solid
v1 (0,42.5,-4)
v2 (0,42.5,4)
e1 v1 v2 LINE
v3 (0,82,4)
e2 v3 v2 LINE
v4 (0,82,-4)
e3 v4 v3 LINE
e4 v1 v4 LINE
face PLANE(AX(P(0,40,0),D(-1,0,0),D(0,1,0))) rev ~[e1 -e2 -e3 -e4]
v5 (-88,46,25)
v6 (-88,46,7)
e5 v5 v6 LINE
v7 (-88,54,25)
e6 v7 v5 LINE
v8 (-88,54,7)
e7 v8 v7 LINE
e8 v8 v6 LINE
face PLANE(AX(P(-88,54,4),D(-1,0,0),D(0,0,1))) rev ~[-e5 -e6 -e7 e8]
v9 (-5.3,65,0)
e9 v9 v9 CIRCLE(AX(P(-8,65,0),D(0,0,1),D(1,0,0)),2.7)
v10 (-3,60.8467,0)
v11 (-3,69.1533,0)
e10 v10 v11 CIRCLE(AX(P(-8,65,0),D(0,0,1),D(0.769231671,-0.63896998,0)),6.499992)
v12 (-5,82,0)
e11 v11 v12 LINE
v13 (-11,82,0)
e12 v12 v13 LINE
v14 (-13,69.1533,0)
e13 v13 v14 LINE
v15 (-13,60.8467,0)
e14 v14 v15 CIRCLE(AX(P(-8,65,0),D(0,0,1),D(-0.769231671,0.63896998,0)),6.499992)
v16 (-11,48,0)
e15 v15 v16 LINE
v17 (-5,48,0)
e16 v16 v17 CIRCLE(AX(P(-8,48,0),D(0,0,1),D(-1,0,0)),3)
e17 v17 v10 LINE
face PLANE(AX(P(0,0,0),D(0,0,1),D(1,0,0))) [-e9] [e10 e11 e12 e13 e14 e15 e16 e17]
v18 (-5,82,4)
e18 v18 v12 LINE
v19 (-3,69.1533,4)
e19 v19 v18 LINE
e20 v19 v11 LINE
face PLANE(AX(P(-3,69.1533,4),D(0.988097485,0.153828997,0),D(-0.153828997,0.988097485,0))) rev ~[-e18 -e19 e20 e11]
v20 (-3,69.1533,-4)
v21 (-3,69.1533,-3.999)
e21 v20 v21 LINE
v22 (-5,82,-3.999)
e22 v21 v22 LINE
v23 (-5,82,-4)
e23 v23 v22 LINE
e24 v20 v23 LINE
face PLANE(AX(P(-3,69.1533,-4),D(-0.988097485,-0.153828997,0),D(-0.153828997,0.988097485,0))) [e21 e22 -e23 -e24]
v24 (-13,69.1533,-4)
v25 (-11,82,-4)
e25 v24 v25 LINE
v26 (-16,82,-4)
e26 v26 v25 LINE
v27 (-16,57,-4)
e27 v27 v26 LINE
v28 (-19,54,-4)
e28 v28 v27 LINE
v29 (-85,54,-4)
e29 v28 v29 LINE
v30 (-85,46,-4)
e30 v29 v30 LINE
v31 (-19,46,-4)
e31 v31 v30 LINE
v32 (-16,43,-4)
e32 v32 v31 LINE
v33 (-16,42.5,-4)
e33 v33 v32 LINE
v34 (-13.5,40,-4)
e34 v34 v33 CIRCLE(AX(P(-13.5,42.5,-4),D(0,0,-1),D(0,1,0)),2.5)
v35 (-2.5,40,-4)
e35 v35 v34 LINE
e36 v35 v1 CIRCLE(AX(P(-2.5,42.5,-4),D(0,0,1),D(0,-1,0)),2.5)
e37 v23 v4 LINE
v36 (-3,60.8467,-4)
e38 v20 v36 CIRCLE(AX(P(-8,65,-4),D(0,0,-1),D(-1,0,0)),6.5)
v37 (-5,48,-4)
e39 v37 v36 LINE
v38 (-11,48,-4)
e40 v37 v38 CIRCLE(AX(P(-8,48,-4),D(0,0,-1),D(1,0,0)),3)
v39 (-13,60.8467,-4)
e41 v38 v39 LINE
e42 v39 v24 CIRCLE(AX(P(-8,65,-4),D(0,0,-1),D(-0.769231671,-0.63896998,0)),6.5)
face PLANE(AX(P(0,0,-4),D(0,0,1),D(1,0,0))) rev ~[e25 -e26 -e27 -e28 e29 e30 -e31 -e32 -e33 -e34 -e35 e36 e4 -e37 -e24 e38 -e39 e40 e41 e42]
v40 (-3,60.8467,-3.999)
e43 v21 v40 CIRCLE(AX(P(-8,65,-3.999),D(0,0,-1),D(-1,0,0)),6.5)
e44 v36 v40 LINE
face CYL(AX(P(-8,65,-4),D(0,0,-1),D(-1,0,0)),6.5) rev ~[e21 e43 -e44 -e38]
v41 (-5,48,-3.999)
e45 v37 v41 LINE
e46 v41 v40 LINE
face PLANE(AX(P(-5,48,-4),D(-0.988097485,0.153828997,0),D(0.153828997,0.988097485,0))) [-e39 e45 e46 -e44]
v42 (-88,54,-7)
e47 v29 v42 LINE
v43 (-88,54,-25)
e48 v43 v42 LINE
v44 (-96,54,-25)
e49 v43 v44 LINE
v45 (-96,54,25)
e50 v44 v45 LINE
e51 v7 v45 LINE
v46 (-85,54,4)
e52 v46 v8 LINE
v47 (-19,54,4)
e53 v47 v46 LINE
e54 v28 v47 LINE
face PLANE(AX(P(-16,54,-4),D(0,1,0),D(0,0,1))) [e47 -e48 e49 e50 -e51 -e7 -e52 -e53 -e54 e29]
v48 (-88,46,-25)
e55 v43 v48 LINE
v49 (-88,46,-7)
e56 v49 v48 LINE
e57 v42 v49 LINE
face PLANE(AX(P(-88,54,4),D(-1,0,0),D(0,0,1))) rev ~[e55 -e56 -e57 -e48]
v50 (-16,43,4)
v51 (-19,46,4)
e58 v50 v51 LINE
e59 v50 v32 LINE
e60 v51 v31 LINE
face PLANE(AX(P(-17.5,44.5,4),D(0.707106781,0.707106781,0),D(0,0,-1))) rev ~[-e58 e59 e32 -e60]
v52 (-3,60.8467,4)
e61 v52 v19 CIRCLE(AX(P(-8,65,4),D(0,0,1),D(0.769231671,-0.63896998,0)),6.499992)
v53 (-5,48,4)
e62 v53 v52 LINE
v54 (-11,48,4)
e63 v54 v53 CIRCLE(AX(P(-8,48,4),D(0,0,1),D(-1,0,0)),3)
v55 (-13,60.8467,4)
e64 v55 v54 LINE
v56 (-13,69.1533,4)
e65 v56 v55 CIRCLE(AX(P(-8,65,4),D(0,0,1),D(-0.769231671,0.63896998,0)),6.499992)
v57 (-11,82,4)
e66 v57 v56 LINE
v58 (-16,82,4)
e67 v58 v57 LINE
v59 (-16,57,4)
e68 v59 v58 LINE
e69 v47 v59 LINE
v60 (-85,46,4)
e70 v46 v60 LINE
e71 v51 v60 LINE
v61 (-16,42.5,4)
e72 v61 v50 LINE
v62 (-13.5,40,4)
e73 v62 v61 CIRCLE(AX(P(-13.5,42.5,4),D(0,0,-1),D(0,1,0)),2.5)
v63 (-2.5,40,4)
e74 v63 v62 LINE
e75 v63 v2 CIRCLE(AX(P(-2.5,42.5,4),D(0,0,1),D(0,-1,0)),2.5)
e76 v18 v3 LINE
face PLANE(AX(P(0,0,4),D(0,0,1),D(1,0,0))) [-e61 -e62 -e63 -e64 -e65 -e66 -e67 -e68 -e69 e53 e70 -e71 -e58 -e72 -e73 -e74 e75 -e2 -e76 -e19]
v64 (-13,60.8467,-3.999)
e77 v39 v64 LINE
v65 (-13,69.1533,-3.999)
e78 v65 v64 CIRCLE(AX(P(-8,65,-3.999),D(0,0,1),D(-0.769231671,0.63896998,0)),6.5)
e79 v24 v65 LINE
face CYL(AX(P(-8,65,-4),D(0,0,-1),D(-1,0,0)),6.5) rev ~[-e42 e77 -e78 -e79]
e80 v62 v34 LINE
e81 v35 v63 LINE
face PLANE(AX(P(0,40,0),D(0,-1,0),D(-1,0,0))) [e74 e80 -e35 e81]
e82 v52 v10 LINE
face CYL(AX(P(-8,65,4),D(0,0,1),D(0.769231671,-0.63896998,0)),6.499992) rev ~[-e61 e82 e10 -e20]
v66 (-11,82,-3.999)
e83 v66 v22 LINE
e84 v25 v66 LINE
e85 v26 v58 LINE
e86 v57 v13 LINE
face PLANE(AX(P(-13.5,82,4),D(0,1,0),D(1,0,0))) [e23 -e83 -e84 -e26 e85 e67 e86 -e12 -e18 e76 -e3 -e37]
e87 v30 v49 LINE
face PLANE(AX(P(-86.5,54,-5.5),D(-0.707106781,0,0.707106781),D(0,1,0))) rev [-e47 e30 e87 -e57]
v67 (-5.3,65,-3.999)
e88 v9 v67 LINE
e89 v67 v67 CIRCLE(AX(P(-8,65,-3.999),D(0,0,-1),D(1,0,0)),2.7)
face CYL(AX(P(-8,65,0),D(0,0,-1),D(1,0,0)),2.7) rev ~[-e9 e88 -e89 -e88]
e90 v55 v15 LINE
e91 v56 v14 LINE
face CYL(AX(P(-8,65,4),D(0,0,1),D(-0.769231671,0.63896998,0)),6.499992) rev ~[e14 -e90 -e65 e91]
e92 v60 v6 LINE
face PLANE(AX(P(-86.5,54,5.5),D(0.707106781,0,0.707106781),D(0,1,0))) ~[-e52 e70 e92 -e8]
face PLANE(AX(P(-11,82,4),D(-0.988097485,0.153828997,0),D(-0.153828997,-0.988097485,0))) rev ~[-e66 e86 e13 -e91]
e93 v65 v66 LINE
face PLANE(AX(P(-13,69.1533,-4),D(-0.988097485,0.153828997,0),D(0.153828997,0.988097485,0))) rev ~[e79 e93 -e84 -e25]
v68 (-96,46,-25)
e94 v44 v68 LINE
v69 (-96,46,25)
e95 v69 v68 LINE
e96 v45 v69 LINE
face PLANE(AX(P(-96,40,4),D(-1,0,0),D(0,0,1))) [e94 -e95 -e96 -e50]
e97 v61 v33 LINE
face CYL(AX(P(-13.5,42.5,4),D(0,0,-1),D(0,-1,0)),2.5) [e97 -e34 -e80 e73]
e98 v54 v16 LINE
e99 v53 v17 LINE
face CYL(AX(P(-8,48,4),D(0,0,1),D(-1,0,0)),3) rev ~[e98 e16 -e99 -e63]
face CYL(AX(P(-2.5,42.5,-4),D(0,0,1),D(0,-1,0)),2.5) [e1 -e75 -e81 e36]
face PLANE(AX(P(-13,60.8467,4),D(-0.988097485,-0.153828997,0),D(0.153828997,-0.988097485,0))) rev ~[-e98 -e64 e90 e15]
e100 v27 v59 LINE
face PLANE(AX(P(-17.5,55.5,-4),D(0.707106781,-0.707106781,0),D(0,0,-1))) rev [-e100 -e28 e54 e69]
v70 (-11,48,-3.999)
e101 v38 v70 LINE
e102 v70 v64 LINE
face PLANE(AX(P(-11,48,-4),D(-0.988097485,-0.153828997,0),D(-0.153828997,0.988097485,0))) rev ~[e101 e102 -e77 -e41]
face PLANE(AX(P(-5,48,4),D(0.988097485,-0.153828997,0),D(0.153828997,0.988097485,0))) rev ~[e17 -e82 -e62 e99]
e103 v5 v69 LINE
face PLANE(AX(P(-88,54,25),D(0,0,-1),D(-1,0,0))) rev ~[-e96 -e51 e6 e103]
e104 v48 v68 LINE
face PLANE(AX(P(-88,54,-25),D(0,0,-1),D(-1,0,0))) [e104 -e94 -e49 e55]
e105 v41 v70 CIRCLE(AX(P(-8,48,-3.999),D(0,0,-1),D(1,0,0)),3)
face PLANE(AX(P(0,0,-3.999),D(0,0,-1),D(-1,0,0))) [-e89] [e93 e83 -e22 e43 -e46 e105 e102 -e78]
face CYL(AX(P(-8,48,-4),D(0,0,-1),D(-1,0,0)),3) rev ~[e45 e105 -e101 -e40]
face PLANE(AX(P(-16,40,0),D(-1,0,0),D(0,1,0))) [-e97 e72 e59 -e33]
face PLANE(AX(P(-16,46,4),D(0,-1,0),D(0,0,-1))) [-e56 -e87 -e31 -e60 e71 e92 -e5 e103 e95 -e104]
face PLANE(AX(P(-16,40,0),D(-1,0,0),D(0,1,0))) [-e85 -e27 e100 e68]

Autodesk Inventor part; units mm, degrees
ref_plane "YZ Plane" through (0, 0, 0) normal (1, 0, 0) x (0, 1, 0)
ref_plane "XZ Plane" through (0, 0, 0) normal (0, 1, 0) x (-1, 0, 0)
ref_plane "XY Plane" through (0, 0, 0) normal (0, 0, 1) x (1, 0, 0)
sketch "Skizze2" plane through (0, 0, 0) normal (0, 0, 1) x (1, 0, 0)
  line L0 (-19.9249, 0) -> (3.9249, 0) projected
  line L1 (0, -18.1036) -> (0, 108.6213) projected
  circle A0 centre (-8, 65) radius 2.7
  line L2 (0, 0) -> (0, 87.5)
  arc A1 (0, 87.5) -> (-2.5, 90) centre (-2.5, 87.5) ccw
  line L3 (-13.5, 90) -> (-2.5, 90)
  arc A2 (-13.5, 90) -> (-16, 87.5) centre (-13.5, 87.5) ccw
  line L4 (0, 42.5) -> (0, 87.5)
  line L5 (-16, 40) -> (-16, 87.5)
  line L6 (0, 40) -> (-16, 40)
  point P0 (-8, 90)
  dimension "d4" = 2.5
  dimension "d5" = 2.5
  dimension "d6" = 5.4
  dimension "d8" = 25
  dimension "d17" = 2.5
  dimension "d18" = 2.5
  dimension "d19" = 2.5
  dimension "d144" = 25
extrude "Extrusion1" add sketch "Skizze2" along normal mid plane 8
sketch "Skizze7" plane through (0, 0, -4) normal (0, 0, -1) x (-1, 0, 0)
  arc A0 (16, 87.5) -> (13.5, 90) centre (13.5, 87.5) ccw projected
  line L0 (13.5, 90) -> (2.5, 90) projected
  arc A1 (2.5, 90) -> (0, 87.5) centre (2.5, 87.5) ccw projected
  line L1 (0, 87.5) -> (0, 40) projected
  circle A2 centre (8, 65) radius 2.7 projected
  circle A3 centre (8, 65) radius 6.5
  line L2 (8, 85) -> (8, 45)
  line L3 (13, 82.2483) -> (13, 48.2483)
  line L4 (3, 48.3648) -> (3, 82.3648)
  line L5 (16, 40) -> (16, 87.5) projected
  line L6 (0, 40) -> (16, 40) projected
  circle A4 centre (8, 82) radius 3
  circle A5 centre (8, 48) radius 3
  line L7 (-2, 82) -> (18, 82)
  line L8 (-2, 48) -> (18, 48)
  line L9 (5, 48) -> (3, 60.8467)
  line L10 (11, 48) -> (13, 60.8467)
  line L11 (3, 69.1533) -> (5, 82)
  line L12 (13, 69.1533) -> (11, 82)
  point P0 (0, 0)
  point P1 (8, 65)
  dimension "d133" = 13
  dimension "d136" = 20
  dimension "d137" = 20
  dimension "d194" = 6
  dimension "d195" = 6
  dimension "d196" = 3
  dimension "d197" = 3
  dimension "d198" = 10
  dimension "d199" = 20
  dimension "d200" = 20
extrude "Extrusion5" cut sketch "Skizze7" against normal blind 0.001 contours L8 L2 A5 | A5 L2 L8 | A5 L2 A3 L10 | L3 A3 L2 A2 | A3 L3 | A3 L2 A4 L12 | L7 L2 A4 | A4 L2 L7 | A5 L8 L2 | A5 L9 A3 L2 | L2 L8 A5 | L2 A2 A3 L4 | A3 L11 A4 L2 | L2 L7 A4 | A4 L7 L2 | L4 A3
fillet "Rundung2" radius 2.5 2 edges at (0, 40, 0) (-16, 40, 0)
sketch "Skizze12" plane through (-16, 40, 4) normal (-1, 0, 0) x (0, 0, 1)
  line L0 (0, 47.5) -> (0, 0) projected
  line L1 (-8, 0) -> (-8, 47.5) projected
  line L2 (0, 47.5) -> (0, 2.5) projected
  line L3 (-8, 47.5) -> (0, 47.5) projected
  line L4 (-8, 2.5) -> (-8, 47.5) projected
  line L5 (0, 6) -> (-8, 6)
  line L6 (-8, 6) -> (-8, 14)
  line L7 (-8, 14) -> (0, 14)
  line L8 (0, 14) -> (0, 6)
  line L9 (0, 2.5) -> (-8, 2.5) projected
  point P0 (-4, -40)
  point P1 (0, 8)
  point P2 (-4, 20.6699)
  point P3 (0, 14)
  dimension "d184" = 8
extrude "Extrusion10" add sketch "Skizze12" along normal blind 80 contours L0 L5 L1 L7
sketch "Skizze17" plane through (-16, 54, 4) normal (0, 1, 0) x (1, 0, 0)
  line L0 (-80, 0) -> (-80, 8) projected
  line L1 (-72, 29) -> (-80, 29)
  line L2 (-72, -21) -> (-80, -21)
  line L3 (-80, 29) -> (-80, -21)
  line L4 (-72, 29) -> (-72, -21)
  line L5 (0, 8) -> (0, 0) projected
  line L6 (0, 8) -> (-80, 8) projected
  line L7 (-80, 0) -> (-80, 8) projected
  line L8 (0, 0) -> (-80, 0) projected
  line L9 (-80, 4) -> (0, 4)
  point P0 (16, 4)
  point P1 (-80, 8)
  dimension "d187" = 50
  dimension "d188" = 8
extrude "Extrusion15" add sketch "Skizze17" against normal blind 8 contours L8 L4 L2 L3 | L0 L9 L4 L8 | L0 L6 L4 L9 | L3 L1 L4 L6
chamfer "Fasen10" distance 3 angle 45 4 edges at (-16, 46, 0) (-16, 54, 0) (-88, 50, -4) (-88, 50, 4)
sketch "Skizze18" plane through (0, 0, 4) normal (0, 0, 1) x (1, 0, 0)
  circle A0 centre (-8, 65) radius 2.7 projected
  arc A1 (-13, 69.1533) -> (-13, 60.8467) centre (-8, 65) ccw projected
  line L0 (-11, 82) -> (-13, 69.1533) projected
  arc A2 (-5, 82) -> (-11, 82) centre (-8, 82) ccw projected
  line L1 (-3, 69.1533) -> (-5, 82) projected
  arc A3 (-3, 60.8467) -> (-3, 69.1533) centre (-8, 65) ccw projected
  line L2 (-5, 48) -> (-3, 60.8467) projected
  arc A4 (-11, 48) -> (-5, 48) centre (-8, 48) ccw projected
  line L3 (-13, 60.8467) -> (-11, 48) projected
  circle A5 centre (-8, 65) radius 2.7 projected
  point P0 (0, 0)
extrude "Extrusion16" cut sketch "Skizze18" against normal blind 4
sketch "Skizze19" plane through (-13.5, 90, 4) normal (0, 1, 0) x (1, 0, 0)
  line L0 (11, 0) -> (0, 0) projected
  line L1 (0, 8) -> (11, 8) projected
  line L2 (11, 8) -> (11, 0) projected
  line L3 (13.5, 0) -> (11, 0) projected
  line L4 (13.5, 8) -> (13.5, 0) projected
  line L5 (11, 8) -> (13.5, 8) projected
  line L6 (-2.5, 8) -> (-2.5, 0) projected
  line L7 (0, 0) -> (-2.5, 0) projected
  line L8 (0, 0) -> (0, 8) projected
  line L9 (-2.5, 8) -> (0, 8) projected
  point P0 (13.5, 4)
extrude "Extrusion17" cut sketch "Skizze19" against normal blind 8
properties part number "Gripper neu"
